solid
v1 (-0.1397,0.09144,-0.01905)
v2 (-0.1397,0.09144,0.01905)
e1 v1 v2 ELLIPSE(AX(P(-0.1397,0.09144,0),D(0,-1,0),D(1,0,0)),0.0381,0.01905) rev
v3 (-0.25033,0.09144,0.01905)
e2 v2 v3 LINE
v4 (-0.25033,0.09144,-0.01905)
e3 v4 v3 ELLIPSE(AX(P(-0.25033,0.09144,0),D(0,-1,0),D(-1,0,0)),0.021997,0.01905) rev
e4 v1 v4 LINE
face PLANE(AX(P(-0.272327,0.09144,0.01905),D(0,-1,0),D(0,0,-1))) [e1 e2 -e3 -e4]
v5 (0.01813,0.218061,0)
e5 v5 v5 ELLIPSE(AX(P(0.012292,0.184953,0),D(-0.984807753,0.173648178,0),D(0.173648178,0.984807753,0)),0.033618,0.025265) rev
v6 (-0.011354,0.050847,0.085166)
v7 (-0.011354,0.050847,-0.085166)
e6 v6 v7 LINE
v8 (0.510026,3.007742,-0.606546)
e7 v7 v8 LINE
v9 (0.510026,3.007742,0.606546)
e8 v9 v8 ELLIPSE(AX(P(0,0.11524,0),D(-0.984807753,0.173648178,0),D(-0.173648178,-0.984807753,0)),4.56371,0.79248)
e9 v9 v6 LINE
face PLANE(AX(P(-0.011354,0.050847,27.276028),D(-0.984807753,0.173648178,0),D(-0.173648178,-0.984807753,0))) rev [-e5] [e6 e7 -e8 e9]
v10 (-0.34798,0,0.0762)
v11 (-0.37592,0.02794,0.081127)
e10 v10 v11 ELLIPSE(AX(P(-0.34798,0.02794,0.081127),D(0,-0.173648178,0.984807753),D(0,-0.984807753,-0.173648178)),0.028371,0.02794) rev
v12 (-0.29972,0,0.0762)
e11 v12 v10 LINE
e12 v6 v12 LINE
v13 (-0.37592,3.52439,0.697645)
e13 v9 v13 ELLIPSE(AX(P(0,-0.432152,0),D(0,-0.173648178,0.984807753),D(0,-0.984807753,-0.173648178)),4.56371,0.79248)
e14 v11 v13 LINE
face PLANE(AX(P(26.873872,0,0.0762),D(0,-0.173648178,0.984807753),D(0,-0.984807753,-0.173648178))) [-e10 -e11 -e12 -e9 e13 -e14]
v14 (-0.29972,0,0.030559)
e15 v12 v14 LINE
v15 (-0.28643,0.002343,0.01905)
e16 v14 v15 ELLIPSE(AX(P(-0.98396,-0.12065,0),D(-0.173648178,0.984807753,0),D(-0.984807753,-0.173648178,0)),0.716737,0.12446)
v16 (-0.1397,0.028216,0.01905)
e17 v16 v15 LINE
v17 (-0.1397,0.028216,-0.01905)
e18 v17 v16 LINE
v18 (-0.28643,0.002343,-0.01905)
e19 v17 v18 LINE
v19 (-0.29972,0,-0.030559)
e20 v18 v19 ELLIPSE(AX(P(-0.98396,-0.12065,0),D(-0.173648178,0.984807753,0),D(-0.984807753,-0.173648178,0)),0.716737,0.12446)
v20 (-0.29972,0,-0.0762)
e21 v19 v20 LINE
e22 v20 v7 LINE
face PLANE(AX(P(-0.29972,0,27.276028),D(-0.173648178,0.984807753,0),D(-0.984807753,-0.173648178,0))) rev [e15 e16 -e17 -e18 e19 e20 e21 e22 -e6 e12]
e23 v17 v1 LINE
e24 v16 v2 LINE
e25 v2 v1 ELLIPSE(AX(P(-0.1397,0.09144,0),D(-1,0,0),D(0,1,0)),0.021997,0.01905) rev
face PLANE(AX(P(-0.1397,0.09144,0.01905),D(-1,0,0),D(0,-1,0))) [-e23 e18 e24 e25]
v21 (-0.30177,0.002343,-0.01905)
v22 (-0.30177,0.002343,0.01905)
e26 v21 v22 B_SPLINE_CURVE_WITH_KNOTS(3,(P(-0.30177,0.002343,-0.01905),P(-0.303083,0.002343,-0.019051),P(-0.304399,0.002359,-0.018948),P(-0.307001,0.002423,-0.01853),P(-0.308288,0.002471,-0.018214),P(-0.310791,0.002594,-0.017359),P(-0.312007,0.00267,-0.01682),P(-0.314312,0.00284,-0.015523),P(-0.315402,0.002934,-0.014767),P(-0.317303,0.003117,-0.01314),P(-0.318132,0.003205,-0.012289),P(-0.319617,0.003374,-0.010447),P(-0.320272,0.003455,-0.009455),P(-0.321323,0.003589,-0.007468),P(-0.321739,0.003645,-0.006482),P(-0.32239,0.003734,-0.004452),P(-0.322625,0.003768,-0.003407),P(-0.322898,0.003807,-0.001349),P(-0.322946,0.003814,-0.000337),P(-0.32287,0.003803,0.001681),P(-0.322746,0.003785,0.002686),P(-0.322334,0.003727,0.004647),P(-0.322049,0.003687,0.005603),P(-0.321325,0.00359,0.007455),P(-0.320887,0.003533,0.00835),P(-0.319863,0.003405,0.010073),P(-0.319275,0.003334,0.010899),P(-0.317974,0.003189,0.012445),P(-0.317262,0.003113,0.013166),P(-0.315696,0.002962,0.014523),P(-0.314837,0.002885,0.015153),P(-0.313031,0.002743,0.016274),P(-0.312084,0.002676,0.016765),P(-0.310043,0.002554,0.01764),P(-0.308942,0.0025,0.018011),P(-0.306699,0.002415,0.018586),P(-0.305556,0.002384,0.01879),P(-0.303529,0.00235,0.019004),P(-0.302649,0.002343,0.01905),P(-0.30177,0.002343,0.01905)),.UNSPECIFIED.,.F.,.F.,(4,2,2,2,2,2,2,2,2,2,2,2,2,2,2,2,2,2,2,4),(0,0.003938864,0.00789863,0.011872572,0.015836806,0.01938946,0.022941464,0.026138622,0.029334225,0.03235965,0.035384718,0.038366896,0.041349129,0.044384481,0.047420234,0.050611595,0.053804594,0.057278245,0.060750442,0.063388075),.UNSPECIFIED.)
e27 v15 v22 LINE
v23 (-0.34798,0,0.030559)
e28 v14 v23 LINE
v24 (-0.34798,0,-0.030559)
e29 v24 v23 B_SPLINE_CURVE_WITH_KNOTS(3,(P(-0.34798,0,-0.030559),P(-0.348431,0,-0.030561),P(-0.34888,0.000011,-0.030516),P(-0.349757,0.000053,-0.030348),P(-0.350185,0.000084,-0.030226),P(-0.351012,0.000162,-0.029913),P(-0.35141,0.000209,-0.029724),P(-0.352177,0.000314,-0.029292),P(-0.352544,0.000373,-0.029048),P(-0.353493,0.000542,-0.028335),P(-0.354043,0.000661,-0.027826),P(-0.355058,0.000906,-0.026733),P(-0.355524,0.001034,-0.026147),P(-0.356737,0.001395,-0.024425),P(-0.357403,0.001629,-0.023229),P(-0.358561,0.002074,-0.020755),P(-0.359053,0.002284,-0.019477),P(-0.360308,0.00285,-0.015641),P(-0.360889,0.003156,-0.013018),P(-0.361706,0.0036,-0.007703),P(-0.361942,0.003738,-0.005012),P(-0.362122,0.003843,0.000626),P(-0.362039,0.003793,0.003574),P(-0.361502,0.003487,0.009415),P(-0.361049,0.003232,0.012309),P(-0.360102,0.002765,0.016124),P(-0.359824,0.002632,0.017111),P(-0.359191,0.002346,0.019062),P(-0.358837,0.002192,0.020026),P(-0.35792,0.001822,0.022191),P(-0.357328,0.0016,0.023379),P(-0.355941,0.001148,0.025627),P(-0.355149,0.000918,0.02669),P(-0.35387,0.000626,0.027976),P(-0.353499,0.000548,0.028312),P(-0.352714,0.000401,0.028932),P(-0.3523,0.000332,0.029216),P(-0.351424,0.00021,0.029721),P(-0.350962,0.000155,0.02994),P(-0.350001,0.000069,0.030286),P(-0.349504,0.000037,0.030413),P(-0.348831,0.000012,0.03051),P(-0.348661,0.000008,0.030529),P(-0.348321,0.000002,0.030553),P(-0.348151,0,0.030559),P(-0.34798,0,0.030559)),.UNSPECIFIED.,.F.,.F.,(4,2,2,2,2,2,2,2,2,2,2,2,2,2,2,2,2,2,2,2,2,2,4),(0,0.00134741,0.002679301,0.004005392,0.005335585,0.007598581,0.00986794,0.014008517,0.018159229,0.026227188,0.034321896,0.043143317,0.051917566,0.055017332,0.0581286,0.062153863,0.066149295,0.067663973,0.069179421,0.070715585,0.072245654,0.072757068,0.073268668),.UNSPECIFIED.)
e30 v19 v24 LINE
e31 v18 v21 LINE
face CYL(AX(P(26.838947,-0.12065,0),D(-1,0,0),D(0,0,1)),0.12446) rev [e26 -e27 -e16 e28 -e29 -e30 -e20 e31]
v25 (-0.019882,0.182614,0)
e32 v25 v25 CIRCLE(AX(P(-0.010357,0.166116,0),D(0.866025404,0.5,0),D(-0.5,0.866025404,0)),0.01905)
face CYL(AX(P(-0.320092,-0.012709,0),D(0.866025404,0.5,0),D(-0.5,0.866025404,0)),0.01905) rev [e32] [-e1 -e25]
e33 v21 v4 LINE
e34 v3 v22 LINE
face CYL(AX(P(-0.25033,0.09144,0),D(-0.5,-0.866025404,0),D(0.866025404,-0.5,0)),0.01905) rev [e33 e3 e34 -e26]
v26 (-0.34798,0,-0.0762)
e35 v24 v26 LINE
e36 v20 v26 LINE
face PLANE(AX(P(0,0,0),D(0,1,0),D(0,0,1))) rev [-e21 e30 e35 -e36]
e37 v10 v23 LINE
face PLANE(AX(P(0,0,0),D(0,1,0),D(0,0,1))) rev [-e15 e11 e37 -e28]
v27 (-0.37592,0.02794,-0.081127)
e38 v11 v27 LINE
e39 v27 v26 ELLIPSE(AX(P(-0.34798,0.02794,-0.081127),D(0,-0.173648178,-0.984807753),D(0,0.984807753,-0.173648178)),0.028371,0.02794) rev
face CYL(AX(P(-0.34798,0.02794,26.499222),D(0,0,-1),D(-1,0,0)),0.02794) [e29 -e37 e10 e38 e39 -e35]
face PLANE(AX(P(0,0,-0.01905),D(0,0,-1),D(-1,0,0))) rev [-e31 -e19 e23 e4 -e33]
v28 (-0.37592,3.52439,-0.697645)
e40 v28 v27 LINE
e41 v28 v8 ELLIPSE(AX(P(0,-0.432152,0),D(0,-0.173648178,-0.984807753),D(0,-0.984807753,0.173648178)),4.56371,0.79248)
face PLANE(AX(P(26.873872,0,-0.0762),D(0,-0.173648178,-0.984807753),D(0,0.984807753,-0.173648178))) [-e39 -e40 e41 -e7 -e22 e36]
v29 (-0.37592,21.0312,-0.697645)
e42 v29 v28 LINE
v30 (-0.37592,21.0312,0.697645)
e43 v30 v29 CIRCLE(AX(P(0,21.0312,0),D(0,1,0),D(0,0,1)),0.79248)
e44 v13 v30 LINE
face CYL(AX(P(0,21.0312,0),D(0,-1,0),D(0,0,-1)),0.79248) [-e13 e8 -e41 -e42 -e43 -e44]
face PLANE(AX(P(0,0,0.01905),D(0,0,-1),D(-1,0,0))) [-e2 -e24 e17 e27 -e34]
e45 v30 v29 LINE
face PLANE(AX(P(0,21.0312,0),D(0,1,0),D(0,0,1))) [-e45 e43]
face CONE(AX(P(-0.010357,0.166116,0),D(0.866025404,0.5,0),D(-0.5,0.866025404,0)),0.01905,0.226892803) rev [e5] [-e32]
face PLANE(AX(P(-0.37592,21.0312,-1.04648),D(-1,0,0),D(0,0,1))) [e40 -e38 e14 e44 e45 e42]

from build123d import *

# Parameters (mm, degrees)
TD_SKETCH_R                             = 0.79248
TL_FEATURE_DEPTH                        = 21.0312
TDF_STD_SKETCH_W                        = 2.09296
TDF_STD_SKETCH_H                        = 2.09296
TDF_STD_FEATURE_DEPTH                   = 22.061040395
ISA_20_STD_FEATURE_DEPTH                = 22.061040395
ISA_20_STD_FEATURE_DEPTH_BACK           = 22.061040395
F_10BA_STD_FEATURE_DEPTH                = 22.061040395
F_10BA_STD_FEATURE_DEPTH_BACK           = 22.061040395
FRO_STD_FEATURE_DEPTH                   = 22.061040395
FRO_STD_FEATURE_DEPTH_BACK              = 22.061040395
C_STD_FEATURE_DEPTH                     = 22.061040395
C_STD_FEATURE_DEPTH_BACK                = 22.061040395
ERW_STD_FEATURE_DEPTH                   = 0.01905
H_STD_FEATURE_REACH                     = 22.896
H_STD_SKETCH_R                          = 0.01905
H_STD_SKETCH_3_R                        = 0.01905
FUNNEL_FINAL_DIAMETRE_STD_FEATURE_DEPTH = 2.499995
FUNNEL_FINAL_DIAMETRE_STD_FEATURE_DRAFT = -13
ROUND_BR_STD_FEATURE_START              = -1
ROUND_BR_STD_FEATURE_DEPTH              = 1.009339363


with BuildPart() as part:
    # TD_sketch → TL_feature (new body)
    with BuildSketch(Plane(origin=(0, 0, 0), x_dir=(1, 0, 0), z_dir=(0, 1, 0))):
        with Locations(Location((0, 0, 0), (0, 0, 270))):
            Circle(TD_SKETCH_R)
    extrude(amount=TL_FEATURE_DEPTH)

    # TDF_STD_sketch → TDF_STD_feature (cut, through all)
    with BuildSketch(Plane(origin=(0, 0, 0), x_dir=(1, 0, 0), z_dir=(0, 1, 0))):
        with Locations((-1.4224, 0)):
            Rectangle(TDF_STD_SKETCH_W, TDF_STD_SKETCH_H)
    extrude(amount=TDF_STD_FEATURE_DEPTH, mode=Mode.SUBTRACT)

    # ISA_20_STD_sketch → ISA_20_STD_feature (cut, two sides: drawn at the far end of the back side and taken through both)
    with BuildSketch(Plane(origin=(0, 0, 0), x_dir=(0, 0, -1), z_dir=(1, 0, 0)).offset(-ISA_20_STD_FEATURE_DEPTH_BACK)):
        Polygon((-12.996080373, 73.27228267), (-3.784567997, 21.0312), (-0.0762, 0), (0.0762, 0), (3.784567997, 21.0312), (12.996080373, 73.27228267), (12.996080373, -32.821688483), (-12.996080373, -32.821688483), align=None)
    extrude(amount=ISA_20_STD_FEATURE_DEPTH + ISA_20_STD_FEATURE_DEPTH_BACK, mode=Mode.SUBTRACT)

    # 10BA_STD_sketch → 10BA_STD_feature (cut, two sides: drawn at the far end of the back side and taken through both)
    with BuildSketch(Plane.XY.offset(-F_10BA_STD_FEATURE_DEPTH_BACK)):
        Polygon((-53.216424634, 0), (-0.37592, 0), (-0.29972, 0), (-0.011354365, 0.050846642), (3.688047997, 21.0312), (12.863705333, 73.068938636), (91.245889802, 2.18375769), (25.165759835, -70.885180946), align=None)
    extrude(amount=F_10BA_STD_FEATURE_DEPTH + F_10BA_STD_FEATURE_DEPTH_BACK, mode=Mode.SUBTRACT)

    # FRO_STD_sketch → FRO_STD_feature (cut, two sides: drawn at the far end of the back side and taken through both)
    with BuildSketch(Plane.XY.offset(-FRO_STD_FEATURE_DEPTH_BACK)):
        with BuildLine():
            Line((-0.37592, 52.152138388), (-0.37592, 0.02794))
            ThreePointArc((-0.37592, 0.02794), (-0.367736563, 0.008183437), (-0.34798, 0))
            Line((-0.34798, 0), (51.776218388, 0))
            Line((51.776218388, 0), (-21.9385299, -73.714748288))
            Line((-21.9385299, -73.714748288), (-74.090668288, -21.5626099))
            Line((-74.090668288, -21.5626099), (-0.37592, 52.152138388))
        make_face()
    extrude(amount=FRO_STD_FEATURE_DEPTH + FRO_STD_FEATURE_DEPTH_BACK, mode=Mode.SUBTRACT)

    # C_STD_sketch → C_STD_feature (cut, two sides: drawn at the far end of the back side and taken through both)
    with BuildSketch(Plane(origin=(0, 0, 0), x_dir=(0, 0, -1), z_dir=(1, 0, 0)).offset(-C_STD_FEATURE_DEPTH_BACK)):
        with BuildLine():
            Line((-50.530423385, -12.791040855), (-0.030559272, 0))
            ThreePointArc((-0.030559272, 0), (0, 0.00381), (0.030559272, 0))
            Line((0.030559272, 0), (50.530423385, -12.791040855))
            Line((50.530423385, -12.791040855), (50.530423385, -116.980234183))
            Line((50.530423385, -116.980234183), (-50.530423385, -116.980234183))
            Line((-50.530423385, -116.980234183), (-50.530423385, -12.791040855))
        make_face()
    extrude(amount=C_STD_FEATURE_DEPTH + C_STD_FEATURE_DEPTH_BACK, mode=Mode.SUBTRACT)


with BuildPart() as body_2:
    # ERW_STD_sketch → ERW_STD_feature (new, symmetric)
    with BuildSketch(Plane.XY):
        Polygon((-0.1397, 0.09144), (-0.1397, 0), (-0.32512, 0), (-0.272327091, 0.09144), align=None)
    extrude(amount=ERW_STD_FEATURE_DEPTH, both=True)

    # H_STD_sketch → H_STD_feature (add, up to next)
    with BuildSketch(Plane(origin=(-0.010357492, 0.166115932, 0), x_dir=(0, 0, -1), z_dir=(0.8660254037844415, 0.4999999999999953, 0)), mode=Mode.PRIVATE) as h_std_feature_sk1:
        with Locations(Location((0, 0, 0), (0, 0, 90))):
            Circle(H_STD_SKETCH_R)
    h_std_feature_tool1 = extrude(h_std_feature_sk1.sketch, amount=-H_STD_FEATURE_REACH, mode=Mode.PRIVATE) - body_2.part
    add(h_std_feature_tool1.solids().sort_by_distance((-0.010357, 0.166116, 0))[0])


with BuildPart() as funnel_final_diametre_std_feature_tool:
    # H_STD_sketch<3> → funnel_final_diametre_STD_feature (with draft: the straight prism first)
    with BuildSketch(Plane(origin=(-0.010357492, 0.166115932, 0), x_dir=(0, 0, -1), z_dir=(0.8660254037844415, 0.4999999999999953, 0))):
        with Locations(Location((0, 0, 0), (0, 0, 90))):
            Circle(H_STD_SKETCH_3_R)
    extrude(amount=FUNNEL_FINAL_DIAMETRE_STD_FEATURE_DEPTH)
    # funnel_final_diametre_STD_feature: the draft: its side faces are tilted about the plane it starts from
    funnel_final_diametre_std_feature_sides = [funnel_final_diametre_std_feature_tool.faces().sort_by_distance(p)[0] for p in [
        (1.081697098, 0.774616898, 0),
    ]]
    draft(funnel_final_diametre_std_feature_sides, Plane(origin=(-0.010357492, 0.166115932, 0), x_dir=(0, 0, -1), z_dir=(0.8660254037844415, 0.4999999999999953, 0)), FUNNEL_FINAL_DIAMETRE_STD_FEATURE_DRAFT)


with BuildPart() as body_2_1:
    add(body_2.part)

    # funnel_final_diametre_STD_feature: add funnel_final_diametre_std_feature_tool
    add(funnel_final_diametre_std_feature_tool.part)

    # ROUND_BR_STD_feature: read off the stored shape, not the designer's step
    # ROUND_BR_STD_feature outline → ROUND_BR_STD_feature (cut)
    with BuildSketch(Plane(origin=(0, 0, 0), x_dir=(0.8660254037844362, -0.5000000000000042, 0), z_dir=(0.5000000000000042, 0.8660254037844363, 0)).offset(ROUND_BR_STD_FEATURE_START)):
        with BuildLine():
            Line((-0.281562179, -0.01905), (-0.262512179, -0.01905))
            ThreePointArc((-0.262512179, -0.01905), (-0.275982563, -0.013470384), (-0.281562179, 0))
            Line((-0.281562179, 0), (-0.281562179, -0.01905))
        make_face()
        with BuildLine():
            Line((-0.281562179, 0.01905), (-0.281562179, 0))
            ThreePointArc((-0.281562179, 0), (-0.275982563, 0.013470384), (-0.262512179, 0.01905))
            Line((-0.262512179, 0.01905), (-0.281562179, 0.01905))
        make_face()
    extrude(amount=ROUND_BR_STD_FEATURE_DEPTH, mode=Mode.SUBTRACT)


with BuildPart() as part_1:
    add(part.part)

    # COMBINE_STD_feature: cut body 2
    add(body_2_1.part, mode=Mode.SUBTRACT)


solid = part_1.part
